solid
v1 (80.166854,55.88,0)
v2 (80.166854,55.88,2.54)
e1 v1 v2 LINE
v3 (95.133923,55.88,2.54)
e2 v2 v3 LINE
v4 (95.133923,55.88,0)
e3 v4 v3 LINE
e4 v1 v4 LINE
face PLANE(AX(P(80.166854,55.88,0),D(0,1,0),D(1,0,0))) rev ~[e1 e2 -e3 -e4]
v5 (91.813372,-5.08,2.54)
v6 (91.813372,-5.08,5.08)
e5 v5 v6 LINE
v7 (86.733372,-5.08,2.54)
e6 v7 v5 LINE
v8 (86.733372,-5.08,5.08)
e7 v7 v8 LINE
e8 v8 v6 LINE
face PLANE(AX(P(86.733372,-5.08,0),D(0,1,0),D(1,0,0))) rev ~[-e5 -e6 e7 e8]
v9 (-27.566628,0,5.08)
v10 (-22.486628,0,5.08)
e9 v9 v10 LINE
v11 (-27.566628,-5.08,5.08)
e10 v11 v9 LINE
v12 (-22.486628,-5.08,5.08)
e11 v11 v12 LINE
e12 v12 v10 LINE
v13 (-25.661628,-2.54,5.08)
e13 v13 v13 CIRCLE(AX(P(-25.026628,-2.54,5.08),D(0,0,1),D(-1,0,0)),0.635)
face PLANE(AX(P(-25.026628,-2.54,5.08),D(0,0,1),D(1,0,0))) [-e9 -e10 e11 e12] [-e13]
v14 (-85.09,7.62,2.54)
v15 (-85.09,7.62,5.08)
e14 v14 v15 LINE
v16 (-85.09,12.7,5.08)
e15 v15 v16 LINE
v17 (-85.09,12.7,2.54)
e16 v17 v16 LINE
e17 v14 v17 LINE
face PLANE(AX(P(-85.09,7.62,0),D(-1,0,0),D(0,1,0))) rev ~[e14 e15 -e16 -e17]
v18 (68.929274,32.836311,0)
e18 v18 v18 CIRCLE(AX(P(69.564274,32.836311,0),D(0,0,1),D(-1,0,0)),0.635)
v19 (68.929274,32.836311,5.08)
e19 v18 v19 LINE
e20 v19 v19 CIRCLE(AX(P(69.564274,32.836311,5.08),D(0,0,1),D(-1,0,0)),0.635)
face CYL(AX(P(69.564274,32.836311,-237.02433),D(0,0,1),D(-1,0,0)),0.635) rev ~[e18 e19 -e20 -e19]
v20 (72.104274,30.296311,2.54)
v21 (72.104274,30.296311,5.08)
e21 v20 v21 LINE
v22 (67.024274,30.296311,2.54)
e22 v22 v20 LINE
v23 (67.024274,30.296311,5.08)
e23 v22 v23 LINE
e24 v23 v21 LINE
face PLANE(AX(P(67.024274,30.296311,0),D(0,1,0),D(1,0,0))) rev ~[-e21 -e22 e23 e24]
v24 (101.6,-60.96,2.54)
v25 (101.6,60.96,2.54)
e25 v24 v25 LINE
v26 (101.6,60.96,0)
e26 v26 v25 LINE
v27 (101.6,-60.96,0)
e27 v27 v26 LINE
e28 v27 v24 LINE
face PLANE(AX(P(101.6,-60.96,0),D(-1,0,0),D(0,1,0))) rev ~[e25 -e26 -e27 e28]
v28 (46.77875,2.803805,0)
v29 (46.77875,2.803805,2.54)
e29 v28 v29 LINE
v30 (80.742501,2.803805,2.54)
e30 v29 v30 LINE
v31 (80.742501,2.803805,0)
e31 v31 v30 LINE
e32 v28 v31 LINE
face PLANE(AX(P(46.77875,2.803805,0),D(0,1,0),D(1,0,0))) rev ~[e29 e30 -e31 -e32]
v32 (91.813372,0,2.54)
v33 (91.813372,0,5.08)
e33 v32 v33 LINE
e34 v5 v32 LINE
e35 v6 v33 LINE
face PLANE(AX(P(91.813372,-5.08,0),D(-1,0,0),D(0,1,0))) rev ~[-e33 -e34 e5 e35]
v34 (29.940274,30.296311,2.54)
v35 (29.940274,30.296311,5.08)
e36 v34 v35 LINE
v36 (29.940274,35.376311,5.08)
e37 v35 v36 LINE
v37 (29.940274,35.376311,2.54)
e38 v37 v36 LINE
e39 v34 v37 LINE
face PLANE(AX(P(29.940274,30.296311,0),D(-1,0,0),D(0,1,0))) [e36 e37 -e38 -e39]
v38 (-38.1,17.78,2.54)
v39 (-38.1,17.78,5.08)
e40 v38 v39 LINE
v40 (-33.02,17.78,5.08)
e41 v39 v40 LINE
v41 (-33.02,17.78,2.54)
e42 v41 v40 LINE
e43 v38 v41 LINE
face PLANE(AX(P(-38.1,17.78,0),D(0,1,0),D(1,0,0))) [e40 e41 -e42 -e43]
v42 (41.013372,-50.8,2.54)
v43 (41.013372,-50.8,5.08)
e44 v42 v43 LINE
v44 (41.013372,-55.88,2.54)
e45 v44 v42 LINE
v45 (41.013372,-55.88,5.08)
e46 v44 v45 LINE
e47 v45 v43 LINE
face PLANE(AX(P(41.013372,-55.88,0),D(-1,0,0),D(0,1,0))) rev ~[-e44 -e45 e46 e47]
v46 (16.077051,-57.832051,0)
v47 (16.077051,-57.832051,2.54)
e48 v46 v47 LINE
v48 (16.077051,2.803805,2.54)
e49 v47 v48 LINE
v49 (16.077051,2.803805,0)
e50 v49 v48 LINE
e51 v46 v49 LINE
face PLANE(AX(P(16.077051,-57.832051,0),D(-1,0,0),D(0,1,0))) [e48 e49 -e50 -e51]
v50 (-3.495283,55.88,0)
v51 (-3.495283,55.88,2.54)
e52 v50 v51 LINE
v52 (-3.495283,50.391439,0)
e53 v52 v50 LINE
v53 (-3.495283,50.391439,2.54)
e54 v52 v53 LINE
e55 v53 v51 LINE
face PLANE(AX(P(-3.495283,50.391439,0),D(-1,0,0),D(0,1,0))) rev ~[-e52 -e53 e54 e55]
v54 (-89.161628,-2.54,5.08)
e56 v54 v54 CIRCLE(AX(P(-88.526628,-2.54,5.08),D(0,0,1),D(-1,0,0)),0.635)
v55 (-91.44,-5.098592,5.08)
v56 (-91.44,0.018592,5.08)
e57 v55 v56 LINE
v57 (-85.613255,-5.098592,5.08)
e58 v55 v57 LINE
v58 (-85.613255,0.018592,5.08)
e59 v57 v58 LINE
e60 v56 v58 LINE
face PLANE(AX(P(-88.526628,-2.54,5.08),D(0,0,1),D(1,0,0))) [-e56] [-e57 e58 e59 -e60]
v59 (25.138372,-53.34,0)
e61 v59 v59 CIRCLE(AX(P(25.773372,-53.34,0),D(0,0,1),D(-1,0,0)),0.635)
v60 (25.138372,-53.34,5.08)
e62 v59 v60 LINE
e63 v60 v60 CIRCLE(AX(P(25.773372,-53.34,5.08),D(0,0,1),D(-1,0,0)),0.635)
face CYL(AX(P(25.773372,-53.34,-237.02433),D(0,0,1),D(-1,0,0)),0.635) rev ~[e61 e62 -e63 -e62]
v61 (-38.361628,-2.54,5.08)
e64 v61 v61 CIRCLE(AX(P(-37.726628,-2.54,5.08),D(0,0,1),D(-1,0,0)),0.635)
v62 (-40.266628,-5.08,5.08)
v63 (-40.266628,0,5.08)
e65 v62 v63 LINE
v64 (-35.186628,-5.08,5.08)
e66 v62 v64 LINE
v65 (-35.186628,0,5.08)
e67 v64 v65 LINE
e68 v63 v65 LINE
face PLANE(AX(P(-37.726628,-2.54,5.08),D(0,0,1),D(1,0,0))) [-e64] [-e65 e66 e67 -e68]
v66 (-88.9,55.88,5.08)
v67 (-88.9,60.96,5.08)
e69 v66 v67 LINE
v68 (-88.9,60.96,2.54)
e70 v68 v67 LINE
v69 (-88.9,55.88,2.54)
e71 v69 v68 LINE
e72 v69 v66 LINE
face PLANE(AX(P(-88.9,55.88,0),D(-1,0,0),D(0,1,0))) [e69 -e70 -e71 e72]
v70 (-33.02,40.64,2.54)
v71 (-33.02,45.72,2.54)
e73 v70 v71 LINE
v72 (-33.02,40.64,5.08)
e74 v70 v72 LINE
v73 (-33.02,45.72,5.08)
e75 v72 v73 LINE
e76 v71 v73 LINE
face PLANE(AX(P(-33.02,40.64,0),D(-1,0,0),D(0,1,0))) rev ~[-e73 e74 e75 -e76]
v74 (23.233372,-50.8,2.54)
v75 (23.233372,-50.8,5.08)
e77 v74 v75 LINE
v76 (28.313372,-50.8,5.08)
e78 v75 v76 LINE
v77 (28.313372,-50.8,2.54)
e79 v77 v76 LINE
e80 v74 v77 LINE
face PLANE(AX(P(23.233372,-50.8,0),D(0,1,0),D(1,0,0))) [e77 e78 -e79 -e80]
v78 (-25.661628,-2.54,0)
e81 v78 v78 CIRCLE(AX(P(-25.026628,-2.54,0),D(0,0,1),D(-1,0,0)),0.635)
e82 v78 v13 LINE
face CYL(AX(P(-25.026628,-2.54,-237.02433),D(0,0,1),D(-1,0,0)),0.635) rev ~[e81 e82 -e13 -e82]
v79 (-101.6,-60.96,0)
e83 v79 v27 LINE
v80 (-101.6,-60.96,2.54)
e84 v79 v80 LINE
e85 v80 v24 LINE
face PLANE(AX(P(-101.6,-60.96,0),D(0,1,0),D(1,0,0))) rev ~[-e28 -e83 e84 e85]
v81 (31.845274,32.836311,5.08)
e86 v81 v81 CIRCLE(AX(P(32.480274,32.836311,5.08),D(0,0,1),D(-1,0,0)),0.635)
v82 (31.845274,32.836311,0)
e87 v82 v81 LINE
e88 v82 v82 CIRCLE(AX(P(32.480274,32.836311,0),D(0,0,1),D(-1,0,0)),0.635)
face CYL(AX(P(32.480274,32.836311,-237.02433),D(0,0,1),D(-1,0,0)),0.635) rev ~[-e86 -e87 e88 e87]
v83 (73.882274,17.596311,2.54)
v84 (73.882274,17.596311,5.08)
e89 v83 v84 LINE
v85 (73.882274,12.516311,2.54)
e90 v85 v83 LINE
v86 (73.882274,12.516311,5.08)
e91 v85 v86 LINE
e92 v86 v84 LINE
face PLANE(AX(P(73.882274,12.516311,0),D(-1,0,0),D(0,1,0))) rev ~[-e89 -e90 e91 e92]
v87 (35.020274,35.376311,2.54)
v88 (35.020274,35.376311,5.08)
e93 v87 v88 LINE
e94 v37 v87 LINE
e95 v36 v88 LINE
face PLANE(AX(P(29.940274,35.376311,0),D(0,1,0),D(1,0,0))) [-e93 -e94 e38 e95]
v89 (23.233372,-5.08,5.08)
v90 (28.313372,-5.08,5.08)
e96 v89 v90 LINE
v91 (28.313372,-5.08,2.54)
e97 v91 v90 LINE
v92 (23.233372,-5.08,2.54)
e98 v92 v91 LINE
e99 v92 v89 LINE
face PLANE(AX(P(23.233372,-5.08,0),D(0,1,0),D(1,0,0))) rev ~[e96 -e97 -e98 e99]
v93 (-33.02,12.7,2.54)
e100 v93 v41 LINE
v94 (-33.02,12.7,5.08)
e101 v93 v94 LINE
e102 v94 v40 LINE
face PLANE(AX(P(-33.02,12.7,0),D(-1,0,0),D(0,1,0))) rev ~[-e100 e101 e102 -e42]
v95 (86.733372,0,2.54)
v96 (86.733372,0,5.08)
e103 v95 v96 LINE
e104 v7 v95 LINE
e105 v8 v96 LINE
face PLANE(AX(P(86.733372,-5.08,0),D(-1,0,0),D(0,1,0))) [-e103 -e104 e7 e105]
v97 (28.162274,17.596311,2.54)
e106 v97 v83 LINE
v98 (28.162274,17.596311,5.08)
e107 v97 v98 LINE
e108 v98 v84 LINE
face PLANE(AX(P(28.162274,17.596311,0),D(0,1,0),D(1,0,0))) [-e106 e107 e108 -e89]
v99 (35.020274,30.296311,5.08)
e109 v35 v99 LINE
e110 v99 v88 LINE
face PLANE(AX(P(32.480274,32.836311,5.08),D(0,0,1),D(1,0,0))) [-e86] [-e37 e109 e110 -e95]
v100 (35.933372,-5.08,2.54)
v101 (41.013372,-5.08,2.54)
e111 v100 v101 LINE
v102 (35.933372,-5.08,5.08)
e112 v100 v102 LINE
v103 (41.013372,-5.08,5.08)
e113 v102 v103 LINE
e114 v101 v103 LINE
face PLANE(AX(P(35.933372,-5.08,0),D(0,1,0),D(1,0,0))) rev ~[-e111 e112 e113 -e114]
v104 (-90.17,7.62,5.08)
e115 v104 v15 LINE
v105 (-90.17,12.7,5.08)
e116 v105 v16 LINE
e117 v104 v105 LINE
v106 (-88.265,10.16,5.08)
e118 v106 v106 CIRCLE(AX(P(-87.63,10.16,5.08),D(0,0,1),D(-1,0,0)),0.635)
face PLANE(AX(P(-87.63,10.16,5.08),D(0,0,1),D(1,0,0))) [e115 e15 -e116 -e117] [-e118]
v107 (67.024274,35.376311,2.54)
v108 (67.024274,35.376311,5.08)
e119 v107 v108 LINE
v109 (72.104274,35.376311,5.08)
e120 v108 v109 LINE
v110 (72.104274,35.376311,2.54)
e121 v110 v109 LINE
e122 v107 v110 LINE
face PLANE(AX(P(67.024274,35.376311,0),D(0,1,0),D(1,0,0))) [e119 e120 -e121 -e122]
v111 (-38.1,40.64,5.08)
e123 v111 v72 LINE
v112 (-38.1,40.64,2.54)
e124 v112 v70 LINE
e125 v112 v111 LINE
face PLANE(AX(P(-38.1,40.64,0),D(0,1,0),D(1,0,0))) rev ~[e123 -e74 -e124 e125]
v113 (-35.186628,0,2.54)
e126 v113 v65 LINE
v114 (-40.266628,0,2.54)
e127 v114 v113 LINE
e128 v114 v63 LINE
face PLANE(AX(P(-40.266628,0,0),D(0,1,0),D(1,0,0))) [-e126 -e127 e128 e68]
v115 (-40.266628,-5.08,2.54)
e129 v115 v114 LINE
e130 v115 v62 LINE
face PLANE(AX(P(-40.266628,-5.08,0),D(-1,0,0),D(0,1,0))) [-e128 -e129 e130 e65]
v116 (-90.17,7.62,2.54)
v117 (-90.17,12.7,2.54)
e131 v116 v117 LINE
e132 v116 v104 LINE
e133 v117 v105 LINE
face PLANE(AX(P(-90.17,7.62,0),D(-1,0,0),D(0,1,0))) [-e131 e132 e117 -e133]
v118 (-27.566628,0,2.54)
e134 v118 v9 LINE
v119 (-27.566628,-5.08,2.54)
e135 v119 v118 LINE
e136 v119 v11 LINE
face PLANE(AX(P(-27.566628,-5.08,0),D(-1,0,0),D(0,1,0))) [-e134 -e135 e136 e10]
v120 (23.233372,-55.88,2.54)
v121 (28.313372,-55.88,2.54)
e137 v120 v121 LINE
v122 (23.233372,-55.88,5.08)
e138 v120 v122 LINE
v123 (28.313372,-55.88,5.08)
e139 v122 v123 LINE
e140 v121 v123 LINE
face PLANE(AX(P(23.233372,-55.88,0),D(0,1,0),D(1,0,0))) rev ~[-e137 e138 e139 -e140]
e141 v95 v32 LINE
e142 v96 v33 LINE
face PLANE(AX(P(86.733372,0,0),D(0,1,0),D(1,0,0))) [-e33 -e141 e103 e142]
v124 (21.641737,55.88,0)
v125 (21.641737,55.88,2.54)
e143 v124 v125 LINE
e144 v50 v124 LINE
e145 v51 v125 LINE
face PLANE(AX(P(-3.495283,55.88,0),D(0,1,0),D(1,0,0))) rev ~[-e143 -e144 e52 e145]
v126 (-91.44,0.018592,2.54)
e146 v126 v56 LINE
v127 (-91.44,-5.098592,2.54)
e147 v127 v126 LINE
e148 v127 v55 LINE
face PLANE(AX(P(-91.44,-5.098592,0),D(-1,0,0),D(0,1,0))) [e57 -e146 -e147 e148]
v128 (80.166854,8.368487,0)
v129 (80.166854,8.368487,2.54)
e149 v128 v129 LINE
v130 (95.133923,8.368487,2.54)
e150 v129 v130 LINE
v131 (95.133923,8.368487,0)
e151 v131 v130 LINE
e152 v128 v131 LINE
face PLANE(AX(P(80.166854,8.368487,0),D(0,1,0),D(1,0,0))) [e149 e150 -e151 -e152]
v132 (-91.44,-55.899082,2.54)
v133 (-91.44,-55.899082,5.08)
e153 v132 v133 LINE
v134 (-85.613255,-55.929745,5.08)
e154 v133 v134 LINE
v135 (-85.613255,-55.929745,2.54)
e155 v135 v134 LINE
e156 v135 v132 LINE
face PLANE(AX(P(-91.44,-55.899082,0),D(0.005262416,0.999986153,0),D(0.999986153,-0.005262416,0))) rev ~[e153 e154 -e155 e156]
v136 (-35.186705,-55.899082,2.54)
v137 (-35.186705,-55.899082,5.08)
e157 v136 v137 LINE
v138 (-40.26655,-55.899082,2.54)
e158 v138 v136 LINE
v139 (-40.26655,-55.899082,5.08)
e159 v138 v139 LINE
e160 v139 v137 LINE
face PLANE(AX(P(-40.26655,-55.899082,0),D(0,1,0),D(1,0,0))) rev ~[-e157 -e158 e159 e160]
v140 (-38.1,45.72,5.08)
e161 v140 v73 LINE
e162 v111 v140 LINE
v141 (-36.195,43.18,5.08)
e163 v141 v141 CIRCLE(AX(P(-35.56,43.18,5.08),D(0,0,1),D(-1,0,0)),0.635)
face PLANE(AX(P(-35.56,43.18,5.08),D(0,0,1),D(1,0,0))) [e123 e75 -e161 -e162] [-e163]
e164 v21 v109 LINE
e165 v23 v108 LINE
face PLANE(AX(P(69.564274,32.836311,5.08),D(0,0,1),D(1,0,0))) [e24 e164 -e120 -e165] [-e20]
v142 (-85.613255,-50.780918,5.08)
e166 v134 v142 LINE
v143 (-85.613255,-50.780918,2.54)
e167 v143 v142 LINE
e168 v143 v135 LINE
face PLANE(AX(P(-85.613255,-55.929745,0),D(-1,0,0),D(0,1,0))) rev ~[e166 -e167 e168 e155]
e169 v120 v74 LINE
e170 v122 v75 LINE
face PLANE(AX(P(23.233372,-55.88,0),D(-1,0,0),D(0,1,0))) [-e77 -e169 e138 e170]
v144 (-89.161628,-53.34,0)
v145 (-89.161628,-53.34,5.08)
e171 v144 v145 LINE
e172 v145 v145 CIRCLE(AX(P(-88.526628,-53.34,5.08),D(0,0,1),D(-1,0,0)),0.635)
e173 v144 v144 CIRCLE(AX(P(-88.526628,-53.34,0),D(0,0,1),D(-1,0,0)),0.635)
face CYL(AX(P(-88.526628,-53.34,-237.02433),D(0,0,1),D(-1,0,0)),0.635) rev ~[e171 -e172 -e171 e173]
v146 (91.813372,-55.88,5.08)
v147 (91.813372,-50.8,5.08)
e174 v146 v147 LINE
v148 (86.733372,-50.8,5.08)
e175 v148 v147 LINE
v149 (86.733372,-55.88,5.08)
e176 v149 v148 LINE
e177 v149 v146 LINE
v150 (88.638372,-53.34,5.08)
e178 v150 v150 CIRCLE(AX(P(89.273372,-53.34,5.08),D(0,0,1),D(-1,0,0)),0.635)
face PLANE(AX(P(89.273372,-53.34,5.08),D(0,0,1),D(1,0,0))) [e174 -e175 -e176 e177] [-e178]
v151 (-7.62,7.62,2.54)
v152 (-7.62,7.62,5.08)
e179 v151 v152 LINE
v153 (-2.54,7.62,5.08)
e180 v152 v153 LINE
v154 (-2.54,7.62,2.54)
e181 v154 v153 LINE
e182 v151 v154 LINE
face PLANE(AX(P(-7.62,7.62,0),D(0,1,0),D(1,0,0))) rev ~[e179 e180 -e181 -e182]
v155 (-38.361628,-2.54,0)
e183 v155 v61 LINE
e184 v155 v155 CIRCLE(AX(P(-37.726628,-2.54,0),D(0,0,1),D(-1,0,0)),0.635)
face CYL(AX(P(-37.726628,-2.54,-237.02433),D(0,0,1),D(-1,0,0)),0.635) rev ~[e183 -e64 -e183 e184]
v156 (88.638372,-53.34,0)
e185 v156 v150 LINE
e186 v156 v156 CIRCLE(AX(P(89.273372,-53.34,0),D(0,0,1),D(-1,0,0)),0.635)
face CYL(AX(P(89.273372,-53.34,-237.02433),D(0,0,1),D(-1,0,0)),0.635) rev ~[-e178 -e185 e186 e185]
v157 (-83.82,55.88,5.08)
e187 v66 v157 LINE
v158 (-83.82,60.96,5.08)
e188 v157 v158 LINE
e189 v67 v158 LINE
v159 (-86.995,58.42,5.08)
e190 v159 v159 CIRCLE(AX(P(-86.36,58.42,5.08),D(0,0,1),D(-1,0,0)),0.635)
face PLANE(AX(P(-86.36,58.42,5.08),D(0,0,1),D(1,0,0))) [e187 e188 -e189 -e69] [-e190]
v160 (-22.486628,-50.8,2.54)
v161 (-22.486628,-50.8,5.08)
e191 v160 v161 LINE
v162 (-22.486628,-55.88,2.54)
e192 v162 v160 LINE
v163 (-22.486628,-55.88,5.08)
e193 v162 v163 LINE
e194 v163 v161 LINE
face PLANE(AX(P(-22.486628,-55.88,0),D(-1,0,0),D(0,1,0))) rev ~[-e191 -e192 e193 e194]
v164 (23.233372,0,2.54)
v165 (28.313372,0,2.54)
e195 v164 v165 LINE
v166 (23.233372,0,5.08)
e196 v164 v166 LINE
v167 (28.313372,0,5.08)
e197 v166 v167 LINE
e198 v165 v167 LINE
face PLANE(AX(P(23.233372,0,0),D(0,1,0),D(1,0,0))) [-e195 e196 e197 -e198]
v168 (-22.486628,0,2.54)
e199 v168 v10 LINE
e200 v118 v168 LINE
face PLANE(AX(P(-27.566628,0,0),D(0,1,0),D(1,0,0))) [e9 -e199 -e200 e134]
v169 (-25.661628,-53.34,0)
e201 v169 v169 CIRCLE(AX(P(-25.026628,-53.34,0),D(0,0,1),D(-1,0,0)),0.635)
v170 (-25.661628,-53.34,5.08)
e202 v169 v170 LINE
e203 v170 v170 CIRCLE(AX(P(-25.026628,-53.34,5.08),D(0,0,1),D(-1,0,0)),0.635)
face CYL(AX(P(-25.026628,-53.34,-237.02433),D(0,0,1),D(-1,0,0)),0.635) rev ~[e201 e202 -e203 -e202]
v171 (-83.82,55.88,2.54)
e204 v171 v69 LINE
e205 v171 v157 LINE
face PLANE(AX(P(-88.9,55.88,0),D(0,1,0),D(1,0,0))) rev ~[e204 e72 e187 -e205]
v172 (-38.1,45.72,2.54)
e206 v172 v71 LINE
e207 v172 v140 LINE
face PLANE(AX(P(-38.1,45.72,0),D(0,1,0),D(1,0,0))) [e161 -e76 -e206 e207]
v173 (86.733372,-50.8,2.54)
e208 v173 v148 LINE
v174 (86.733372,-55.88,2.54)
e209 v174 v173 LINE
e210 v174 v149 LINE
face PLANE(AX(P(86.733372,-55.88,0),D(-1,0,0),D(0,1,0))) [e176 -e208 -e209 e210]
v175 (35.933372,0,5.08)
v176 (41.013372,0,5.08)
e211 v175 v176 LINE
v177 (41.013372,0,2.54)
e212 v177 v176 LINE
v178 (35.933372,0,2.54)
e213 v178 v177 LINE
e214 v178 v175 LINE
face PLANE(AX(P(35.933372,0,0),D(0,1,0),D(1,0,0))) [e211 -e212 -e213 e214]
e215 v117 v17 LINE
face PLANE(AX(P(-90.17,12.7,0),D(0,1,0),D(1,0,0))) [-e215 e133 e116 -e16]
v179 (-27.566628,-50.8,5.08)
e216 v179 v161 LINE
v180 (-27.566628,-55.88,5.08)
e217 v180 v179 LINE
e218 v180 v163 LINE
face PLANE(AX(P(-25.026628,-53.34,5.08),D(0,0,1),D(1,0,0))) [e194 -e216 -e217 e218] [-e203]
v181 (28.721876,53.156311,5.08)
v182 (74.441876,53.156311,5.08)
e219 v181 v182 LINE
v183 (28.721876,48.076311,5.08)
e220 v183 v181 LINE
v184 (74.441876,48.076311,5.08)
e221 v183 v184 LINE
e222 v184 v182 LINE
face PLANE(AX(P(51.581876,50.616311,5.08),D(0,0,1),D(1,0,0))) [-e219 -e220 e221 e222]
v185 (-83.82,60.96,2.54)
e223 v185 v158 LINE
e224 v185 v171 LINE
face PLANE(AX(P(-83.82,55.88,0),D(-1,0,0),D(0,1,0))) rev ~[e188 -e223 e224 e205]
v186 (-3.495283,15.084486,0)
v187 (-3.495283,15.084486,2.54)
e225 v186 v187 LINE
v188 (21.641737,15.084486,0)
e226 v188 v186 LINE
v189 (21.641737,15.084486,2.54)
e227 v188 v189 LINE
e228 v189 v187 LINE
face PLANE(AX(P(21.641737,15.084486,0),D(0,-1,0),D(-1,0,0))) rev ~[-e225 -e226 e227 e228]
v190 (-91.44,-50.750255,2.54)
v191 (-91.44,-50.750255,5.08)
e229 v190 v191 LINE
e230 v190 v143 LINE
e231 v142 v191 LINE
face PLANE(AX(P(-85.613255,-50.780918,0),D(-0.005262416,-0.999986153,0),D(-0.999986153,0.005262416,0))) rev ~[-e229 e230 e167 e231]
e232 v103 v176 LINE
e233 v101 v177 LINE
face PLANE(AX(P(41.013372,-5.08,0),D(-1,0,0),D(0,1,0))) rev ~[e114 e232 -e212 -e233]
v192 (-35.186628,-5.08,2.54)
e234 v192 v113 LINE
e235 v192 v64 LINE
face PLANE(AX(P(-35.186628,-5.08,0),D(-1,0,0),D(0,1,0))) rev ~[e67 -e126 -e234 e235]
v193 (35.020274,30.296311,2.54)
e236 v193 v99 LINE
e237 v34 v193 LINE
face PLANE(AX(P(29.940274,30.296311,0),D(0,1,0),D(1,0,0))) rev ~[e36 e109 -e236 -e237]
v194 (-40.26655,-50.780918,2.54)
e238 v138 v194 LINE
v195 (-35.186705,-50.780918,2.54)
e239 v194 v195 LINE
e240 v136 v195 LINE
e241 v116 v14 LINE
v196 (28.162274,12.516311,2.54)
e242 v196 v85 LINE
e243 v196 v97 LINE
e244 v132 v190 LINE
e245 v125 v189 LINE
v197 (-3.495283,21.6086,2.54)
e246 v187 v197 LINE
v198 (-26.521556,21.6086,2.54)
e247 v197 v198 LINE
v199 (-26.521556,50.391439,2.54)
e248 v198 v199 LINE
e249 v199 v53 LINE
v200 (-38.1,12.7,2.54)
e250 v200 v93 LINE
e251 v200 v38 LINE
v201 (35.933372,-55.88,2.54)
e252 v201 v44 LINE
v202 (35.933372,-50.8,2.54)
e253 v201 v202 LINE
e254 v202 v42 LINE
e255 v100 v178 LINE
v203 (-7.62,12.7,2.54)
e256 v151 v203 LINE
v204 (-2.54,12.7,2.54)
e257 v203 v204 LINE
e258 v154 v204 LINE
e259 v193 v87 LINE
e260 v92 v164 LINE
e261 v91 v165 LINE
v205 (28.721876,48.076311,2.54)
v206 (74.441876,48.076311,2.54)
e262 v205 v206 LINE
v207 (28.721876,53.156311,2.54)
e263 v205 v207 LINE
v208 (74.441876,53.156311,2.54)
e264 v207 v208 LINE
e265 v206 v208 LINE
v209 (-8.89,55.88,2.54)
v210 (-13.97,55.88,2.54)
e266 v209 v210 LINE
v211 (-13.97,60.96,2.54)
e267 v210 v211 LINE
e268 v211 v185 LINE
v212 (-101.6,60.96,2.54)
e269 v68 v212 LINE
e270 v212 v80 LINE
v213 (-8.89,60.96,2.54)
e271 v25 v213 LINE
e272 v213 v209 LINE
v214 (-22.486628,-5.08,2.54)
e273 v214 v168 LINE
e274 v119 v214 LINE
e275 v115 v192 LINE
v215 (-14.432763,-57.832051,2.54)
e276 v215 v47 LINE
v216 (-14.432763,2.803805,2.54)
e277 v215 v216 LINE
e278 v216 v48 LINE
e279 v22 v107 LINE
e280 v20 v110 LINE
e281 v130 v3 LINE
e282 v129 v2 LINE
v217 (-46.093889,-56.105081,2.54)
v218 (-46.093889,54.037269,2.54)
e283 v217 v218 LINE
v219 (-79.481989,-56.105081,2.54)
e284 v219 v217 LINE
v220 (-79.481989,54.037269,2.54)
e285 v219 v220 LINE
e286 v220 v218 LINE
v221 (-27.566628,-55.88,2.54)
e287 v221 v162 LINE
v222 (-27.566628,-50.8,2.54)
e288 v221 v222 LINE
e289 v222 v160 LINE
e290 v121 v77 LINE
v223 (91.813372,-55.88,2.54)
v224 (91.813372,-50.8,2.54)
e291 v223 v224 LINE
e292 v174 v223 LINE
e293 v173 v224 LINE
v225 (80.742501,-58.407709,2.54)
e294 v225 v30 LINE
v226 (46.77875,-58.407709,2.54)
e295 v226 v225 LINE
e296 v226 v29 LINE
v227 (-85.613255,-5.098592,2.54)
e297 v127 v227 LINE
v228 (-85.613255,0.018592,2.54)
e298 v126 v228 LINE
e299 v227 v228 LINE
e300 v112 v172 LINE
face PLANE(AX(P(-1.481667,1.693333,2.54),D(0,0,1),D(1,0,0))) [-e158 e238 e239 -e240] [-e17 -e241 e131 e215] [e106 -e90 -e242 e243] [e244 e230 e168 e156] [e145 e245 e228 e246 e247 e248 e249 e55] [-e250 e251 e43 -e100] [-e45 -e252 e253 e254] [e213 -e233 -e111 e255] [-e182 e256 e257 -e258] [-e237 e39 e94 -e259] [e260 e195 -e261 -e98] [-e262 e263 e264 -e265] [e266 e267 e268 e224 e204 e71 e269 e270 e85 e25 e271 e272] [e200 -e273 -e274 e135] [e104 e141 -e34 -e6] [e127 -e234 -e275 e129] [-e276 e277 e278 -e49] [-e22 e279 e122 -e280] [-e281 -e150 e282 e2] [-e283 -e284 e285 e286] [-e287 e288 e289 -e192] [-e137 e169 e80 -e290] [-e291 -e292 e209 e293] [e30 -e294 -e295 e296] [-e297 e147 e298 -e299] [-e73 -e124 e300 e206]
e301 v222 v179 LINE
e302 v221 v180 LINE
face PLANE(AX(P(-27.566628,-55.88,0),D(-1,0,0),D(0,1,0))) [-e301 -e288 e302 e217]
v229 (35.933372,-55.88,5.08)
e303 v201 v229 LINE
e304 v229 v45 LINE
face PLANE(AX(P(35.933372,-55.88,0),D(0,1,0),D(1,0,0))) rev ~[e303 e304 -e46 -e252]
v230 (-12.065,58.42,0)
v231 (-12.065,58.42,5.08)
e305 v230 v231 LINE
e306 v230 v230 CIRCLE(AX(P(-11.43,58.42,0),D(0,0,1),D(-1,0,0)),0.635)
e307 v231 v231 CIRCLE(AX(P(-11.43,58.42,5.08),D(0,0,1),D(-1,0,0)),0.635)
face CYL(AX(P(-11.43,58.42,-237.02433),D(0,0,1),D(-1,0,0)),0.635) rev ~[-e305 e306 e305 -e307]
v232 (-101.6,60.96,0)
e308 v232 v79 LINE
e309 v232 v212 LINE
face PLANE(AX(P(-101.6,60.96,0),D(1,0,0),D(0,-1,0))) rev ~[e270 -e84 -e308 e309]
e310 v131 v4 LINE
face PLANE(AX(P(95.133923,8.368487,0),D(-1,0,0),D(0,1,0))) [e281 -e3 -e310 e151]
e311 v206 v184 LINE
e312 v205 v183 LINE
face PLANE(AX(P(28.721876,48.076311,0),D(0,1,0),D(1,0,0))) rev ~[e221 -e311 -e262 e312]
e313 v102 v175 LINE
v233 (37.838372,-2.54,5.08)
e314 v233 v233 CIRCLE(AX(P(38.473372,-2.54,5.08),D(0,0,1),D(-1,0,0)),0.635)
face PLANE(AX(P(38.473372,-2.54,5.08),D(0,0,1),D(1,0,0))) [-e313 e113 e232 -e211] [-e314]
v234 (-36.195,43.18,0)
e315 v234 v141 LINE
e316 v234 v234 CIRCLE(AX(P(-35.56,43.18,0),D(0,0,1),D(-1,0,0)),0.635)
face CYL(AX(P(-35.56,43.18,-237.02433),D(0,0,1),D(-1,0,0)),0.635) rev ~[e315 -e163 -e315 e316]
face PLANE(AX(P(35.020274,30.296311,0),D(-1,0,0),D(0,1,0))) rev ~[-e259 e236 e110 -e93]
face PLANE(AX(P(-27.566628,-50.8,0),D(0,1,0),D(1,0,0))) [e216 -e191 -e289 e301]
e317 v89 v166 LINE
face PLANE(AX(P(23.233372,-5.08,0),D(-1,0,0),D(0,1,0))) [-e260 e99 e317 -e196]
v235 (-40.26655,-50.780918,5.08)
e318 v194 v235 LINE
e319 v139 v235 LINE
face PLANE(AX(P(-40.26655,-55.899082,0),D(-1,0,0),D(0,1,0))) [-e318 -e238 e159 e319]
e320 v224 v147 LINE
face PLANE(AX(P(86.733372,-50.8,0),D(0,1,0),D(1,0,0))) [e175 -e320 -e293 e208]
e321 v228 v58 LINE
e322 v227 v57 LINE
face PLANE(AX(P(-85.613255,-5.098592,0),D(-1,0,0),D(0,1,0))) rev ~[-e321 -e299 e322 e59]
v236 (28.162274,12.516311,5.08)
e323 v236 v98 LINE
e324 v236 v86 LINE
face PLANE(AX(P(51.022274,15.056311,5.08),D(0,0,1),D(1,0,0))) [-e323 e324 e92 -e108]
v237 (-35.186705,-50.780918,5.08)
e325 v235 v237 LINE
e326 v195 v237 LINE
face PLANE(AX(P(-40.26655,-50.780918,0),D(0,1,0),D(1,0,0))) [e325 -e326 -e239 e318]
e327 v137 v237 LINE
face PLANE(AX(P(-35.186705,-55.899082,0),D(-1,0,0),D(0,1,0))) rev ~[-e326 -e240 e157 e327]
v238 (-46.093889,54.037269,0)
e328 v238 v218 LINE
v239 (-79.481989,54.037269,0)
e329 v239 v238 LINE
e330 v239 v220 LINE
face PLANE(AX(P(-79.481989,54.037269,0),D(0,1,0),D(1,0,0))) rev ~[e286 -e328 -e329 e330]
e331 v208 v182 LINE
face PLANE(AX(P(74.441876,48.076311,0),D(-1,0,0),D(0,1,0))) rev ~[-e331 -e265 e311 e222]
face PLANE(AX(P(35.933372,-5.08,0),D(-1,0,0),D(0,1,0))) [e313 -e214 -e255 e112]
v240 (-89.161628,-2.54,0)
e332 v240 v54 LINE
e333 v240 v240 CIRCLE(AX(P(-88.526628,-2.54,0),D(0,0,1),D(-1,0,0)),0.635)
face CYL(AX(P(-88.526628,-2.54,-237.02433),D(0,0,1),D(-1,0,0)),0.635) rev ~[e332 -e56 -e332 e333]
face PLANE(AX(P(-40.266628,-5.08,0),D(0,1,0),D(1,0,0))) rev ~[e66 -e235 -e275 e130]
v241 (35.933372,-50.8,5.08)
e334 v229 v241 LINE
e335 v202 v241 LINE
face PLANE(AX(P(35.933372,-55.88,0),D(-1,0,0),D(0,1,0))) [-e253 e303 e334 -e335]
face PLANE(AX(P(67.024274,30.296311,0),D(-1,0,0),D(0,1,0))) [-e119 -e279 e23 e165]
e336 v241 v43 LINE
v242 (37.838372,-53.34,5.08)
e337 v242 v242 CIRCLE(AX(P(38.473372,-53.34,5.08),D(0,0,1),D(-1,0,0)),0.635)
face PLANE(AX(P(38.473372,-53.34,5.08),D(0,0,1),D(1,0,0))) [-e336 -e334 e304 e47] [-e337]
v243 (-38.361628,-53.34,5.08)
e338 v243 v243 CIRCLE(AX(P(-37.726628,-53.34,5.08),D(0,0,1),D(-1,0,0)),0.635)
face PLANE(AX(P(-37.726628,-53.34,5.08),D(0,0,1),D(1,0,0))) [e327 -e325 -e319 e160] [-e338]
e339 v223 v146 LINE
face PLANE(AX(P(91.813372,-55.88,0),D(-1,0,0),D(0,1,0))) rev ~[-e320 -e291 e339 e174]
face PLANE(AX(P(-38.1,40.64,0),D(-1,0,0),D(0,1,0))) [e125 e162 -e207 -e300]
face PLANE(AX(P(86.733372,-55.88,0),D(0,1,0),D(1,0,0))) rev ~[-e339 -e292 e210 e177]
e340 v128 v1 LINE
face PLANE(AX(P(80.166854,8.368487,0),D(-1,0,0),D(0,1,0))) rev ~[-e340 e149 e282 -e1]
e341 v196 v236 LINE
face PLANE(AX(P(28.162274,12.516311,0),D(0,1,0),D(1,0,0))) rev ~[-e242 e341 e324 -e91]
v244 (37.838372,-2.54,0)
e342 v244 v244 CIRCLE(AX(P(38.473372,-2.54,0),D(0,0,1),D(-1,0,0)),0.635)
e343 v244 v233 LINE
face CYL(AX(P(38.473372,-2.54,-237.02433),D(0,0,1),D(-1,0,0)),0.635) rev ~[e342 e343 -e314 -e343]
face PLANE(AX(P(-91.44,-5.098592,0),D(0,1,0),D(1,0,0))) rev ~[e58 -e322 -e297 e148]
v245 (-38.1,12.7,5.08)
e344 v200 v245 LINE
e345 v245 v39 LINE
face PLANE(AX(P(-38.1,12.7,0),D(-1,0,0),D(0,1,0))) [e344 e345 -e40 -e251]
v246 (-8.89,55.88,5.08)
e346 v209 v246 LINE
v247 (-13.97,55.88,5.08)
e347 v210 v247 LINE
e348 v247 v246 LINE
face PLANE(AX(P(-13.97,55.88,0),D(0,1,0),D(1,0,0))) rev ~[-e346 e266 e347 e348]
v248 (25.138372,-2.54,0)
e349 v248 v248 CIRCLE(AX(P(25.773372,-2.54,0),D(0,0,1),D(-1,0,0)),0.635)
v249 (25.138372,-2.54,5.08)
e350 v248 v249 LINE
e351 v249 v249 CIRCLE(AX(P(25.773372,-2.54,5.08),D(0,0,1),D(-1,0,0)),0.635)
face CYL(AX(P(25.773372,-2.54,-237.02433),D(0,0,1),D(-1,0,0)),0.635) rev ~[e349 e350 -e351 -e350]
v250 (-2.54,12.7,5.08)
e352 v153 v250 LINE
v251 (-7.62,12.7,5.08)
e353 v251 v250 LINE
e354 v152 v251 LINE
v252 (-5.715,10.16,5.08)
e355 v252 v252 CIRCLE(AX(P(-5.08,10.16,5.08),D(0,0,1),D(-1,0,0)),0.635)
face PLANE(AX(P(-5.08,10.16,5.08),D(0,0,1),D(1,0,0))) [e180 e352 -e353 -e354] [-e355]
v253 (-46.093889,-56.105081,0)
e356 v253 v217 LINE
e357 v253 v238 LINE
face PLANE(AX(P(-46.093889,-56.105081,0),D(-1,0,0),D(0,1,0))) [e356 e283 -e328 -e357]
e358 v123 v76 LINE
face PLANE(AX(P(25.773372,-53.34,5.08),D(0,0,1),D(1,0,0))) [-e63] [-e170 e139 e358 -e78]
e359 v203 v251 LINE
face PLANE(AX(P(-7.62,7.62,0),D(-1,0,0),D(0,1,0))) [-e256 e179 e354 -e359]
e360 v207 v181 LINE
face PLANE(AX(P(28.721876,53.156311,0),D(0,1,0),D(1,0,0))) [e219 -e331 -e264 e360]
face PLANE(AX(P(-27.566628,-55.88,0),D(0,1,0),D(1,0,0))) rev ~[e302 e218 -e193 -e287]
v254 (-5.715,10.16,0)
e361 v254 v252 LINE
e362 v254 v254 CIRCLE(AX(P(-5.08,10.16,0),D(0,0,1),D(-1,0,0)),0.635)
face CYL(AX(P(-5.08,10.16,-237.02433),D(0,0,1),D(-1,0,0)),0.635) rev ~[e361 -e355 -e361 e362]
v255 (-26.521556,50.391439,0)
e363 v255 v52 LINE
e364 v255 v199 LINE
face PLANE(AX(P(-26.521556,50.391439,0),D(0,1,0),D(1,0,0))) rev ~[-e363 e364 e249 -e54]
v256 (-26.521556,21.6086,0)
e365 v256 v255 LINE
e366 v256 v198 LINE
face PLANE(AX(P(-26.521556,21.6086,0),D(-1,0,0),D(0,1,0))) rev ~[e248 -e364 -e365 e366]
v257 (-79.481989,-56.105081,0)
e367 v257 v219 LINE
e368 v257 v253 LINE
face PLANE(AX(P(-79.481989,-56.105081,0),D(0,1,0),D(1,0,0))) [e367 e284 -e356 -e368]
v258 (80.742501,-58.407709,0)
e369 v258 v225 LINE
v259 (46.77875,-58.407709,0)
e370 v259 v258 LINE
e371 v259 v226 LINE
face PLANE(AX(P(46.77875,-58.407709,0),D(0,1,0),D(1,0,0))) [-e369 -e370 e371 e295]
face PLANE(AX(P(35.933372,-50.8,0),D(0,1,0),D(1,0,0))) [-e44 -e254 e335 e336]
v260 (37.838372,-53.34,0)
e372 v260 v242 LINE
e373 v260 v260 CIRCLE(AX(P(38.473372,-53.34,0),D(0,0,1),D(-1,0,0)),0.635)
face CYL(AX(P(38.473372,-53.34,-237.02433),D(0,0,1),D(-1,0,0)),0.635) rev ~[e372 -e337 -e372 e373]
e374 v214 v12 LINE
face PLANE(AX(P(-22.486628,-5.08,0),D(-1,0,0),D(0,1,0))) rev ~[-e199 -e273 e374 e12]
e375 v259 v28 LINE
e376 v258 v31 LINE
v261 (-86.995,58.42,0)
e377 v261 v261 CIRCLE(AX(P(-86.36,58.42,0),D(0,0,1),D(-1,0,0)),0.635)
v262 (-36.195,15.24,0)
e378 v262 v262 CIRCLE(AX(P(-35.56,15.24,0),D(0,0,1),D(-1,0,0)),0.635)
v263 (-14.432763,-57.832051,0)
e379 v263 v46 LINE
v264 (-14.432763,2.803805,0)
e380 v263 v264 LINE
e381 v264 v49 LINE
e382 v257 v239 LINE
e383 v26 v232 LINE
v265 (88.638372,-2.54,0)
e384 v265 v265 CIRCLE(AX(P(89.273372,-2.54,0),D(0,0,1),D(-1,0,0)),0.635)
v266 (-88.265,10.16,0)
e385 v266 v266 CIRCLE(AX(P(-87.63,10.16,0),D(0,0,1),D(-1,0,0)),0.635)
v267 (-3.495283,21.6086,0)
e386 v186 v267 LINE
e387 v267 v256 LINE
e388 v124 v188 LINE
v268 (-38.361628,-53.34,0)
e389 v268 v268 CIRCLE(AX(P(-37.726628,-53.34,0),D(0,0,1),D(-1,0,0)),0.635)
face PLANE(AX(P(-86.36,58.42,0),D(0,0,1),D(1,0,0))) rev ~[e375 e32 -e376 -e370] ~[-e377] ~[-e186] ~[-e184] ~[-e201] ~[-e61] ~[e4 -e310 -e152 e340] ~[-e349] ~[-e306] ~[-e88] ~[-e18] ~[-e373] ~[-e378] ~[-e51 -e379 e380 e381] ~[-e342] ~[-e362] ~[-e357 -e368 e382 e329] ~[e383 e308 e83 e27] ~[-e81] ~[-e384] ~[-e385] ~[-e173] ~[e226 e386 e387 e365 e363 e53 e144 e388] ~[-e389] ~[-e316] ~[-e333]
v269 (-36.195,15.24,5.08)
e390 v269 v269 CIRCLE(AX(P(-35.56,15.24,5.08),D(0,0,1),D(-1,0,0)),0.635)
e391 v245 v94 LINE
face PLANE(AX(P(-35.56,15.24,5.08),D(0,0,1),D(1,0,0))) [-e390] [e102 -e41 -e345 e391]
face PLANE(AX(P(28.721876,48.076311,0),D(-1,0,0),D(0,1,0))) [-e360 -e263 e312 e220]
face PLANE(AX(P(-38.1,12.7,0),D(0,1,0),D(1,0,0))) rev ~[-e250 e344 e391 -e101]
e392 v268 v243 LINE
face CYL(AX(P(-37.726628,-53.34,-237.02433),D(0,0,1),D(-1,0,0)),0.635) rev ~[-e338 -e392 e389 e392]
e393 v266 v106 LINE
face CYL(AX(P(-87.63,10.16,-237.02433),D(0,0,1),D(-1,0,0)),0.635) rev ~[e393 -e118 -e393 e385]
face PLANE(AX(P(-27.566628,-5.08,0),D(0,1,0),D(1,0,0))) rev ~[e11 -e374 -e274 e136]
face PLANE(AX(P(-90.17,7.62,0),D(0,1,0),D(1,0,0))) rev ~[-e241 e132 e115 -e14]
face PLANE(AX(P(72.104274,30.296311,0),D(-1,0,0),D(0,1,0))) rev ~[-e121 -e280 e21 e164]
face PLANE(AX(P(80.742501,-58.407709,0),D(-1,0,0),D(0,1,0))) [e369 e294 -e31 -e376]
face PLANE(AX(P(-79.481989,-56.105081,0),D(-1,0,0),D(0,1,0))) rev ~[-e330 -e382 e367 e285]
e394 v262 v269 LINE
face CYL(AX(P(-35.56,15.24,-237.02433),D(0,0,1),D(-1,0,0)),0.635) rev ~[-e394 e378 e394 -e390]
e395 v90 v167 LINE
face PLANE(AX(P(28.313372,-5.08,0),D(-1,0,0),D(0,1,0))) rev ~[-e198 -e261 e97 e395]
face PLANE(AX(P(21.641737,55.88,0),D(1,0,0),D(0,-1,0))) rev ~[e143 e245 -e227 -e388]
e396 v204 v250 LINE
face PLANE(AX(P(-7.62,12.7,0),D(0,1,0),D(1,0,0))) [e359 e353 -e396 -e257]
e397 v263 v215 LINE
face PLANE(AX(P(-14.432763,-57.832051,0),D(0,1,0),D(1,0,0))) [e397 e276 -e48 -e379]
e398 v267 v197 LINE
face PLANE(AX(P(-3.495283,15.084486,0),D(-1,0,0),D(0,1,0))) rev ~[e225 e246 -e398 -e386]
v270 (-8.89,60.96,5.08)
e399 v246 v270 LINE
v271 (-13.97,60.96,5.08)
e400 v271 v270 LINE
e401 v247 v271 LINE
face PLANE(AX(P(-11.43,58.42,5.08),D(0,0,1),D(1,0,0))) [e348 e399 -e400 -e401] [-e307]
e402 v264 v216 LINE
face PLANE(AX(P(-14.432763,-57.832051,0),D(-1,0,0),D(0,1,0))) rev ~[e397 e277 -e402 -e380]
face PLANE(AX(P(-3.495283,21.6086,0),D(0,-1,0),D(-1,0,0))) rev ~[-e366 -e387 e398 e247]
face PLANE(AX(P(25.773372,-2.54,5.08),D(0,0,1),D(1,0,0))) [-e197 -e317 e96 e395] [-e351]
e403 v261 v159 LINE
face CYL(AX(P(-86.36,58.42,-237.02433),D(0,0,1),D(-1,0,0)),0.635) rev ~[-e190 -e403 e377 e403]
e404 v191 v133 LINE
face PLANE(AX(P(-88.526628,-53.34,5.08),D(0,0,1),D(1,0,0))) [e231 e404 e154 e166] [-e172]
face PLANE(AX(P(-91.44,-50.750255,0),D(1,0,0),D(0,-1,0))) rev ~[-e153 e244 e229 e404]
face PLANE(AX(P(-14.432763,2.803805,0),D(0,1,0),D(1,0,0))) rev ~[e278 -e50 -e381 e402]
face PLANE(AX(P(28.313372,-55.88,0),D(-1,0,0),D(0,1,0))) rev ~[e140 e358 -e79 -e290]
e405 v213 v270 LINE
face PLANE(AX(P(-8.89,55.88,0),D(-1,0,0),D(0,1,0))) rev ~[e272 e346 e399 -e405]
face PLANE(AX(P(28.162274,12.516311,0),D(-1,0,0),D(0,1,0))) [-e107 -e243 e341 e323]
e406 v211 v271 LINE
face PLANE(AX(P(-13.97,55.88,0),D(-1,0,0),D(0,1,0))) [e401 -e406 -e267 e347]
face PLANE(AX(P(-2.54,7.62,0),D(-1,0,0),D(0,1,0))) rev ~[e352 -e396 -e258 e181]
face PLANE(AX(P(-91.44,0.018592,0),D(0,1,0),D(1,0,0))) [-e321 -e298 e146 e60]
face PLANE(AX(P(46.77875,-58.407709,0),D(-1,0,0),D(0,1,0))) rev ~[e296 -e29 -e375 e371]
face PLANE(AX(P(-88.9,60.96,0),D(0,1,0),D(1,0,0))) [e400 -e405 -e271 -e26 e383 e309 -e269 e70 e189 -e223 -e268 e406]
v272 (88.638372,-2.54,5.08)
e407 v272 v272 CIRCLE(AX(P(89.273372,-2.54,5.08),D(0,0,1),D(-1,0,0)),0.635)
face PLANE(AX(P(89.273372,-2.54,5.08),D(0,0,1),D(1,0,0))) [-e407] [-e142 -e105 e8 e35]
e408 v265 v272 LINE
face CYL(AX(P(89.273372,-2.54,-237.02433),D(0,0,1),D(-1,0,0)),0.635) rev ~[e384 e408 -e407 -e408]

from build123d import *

# Parameters (mm, degrees)
F0_W     = 5.0798452705
F0_H     = 5.1181645604
F0_W_2   = 5.08
F0_H_2   = 5.08
F0_W_3   = 5.8267449073
F0_H_3   = 5.1171841682
F0_W_4   = 33.3881005645
F0_H_4   = 110.1423501968
F0_W_5   = 30.5098136887
F0_H_5   = 60.6358556543
F0_W_6   = 33.9637510478
F0_H_6   = 61.2115135882
F0_W_7   = 45.72
F0_W_8   = 14.9670690298
F0_H_7   = 47.5115125301
F1_DEPTH = 2.54
F2_DEPTH = 5.08
F5_D     = 1.27


# Not quite as in the source:
# - a feature of the source that left no trace in its solid (it failed there, or was rolled back) is left out
# - a feature names something its author has since deleted; it is built from what else it names


with BuildPart() as f1:
    # F0 (on Top) → F1 (new body)
    with BuildSketch(Plane.XY):
        Polygon((101.6, -60.96), (101.6, 60.96), (-8.89, 60.96), (-8.89, 55.88), (-13.97, 55.88), (-13.97, 60.96), (-83.82, 60.96), (-83.82, 55.88), (-88.9, 55.88), (-88.9, 60.96), (-101.6, 60.96), (-101.6, -60.96), align=None)
        Polygon((-91.44, -50.7502545385), (-85.6132550927, -50.7809177198), (-85.6132550927, -55.9297454615), (-91.44, -55.8990822802), align=None, mode=Mode.SUBTRACT)
        with Locations((-37.7266275464, -53.34)):
            Rectangle(F0_W, F0_H, mode=Mode.SUBTRACT)
        with Locations((-25.0266275464, -53.34)):
            Rectangle(F0_W_2, F0_H_2, mode=Mode.SUBTRACT)
        with Locations((-88.5266275464, -2.54)):
            Rectangle(F0_W_3, F0_H_3, mode=Mode.SUBTRACT)
        with Locations((-62.787938863, -1.0339058936)):
            Rectangle(F0_W_4, F0_H_4, mode=Mode.SUBTRACT)
        with Locations((-37.7266275464, -2.54)):
            Rectangle(F0_W_2, F0_H_2, mode=Mode.SUBTRACT)
        with Locations((-25.0266275464, -2.54)):
            Rectangle(F0_W_2, F0_H_2, mode=Mode.SUBTRACT)
        with Locations((25.7733724536, -53.34)):
            Rectangle(F0_W_2, F0_H_2, mode=Mode.SUBTRACT)
        with Locations((38.4733724536, -53.34)):
            Rectangle(F0_W_2, F0_H_2, mode=Mode.SUBTRACT)
        with Locations((89.2733724536, -53.34)):
            Rectangle(F0_W_2, F0_H_2, mode=Mode.SUBTRACT)
        with Locations((0.8221440949, -27.5141232414)):
            Rectangle(F0_W_5, F0_H_5, mode=Mode.SUBTRACT)
        with Locations((25.7733724536, -2.54)):
            Rectangle(F0_W_2, F0_H_2, mode=Mode.SUBTRACT)
        with Locations((38.4733724536, -2.54)):
            Rectangle(F0_W_2, F0_H_2, mode=Mode.SUBTRACT)
        with Locations((63.7606251985, -27.8019522084)):
            Rectangle(F0_W_6, F0_H_6, mode=Mode.SUBTRACT)
        with Locations((89.2733724536, -2.54)):
            Rectangle(F0_W_2, F0_H_2, mode=Mode.SUBTRACT)
        with Locations((-87.63, 10.16)):
            Rectangle(F0_W_2, F0_H_2, mode=Mode.SUBTRACT)
        with Locations((-5.08, 10.16)):
            Rectangle(F0_W_2, F0_H_2, mode=Mode.SUBTRACT)
        with Locations((-35.56, 15.24)):
            Rectangle(F0_W_2, F0_H_2, mode=Mode.SUBTRACT)
        with Locations((-35.56, 43.18)):
            Rectangle(F0_W_2, F0_H_2, mode=Mode.SUBTRACT)
        Polygon((-3.4952829592, 50.3914393485), (-3.4952829592, 55.88), (21.6417368501, 55.88), (21.6417368501, 15.0844864547), (-3.4952829592, 15.0844864547), (-3.4952829592, 21.6086003929), (-26.5215560794, 21.6086003929), (-26.5215560794, 50.3914393485), align=None, mode=Mode.SUBTRACT)
        with Locations((51.0222736127, 15.0563112164)):
            Rectangle(F0_W_7, F0_H_2, mode=Mode.SUBTRACT)
        with Locations((32.4802736127, 32.8363112164)):
            Rectangle(F0_W_2, F0_H_2, mode=Mode.SUBTRACT)
        with Locations((69.5642736127, 32.8363112164)):
            Rectangle(F0_W_2, F0_H_2, mode=Mode.SUBTRACT)
        with Locations((87.6503884792, 32.1242437349)):
            Rectangle(F0_W_8, F0_H_7, mode=Mode.SUBTRACT)
        with Locations((51.5818764424, 50.6163112164)):
            Rectangle(F0_W_7, F0_H_2, mode=Mode.SUBTRACT)
    extrude(amount=F1_DEPTH)

    # F0 (on Top) → F2 (join)
    with BuildSketch(Plane.XY):
        with Locations((-86.36, 58.42)):
            Rectangle(F0_W_2, F0_H_2)
        with Locations((-35.56, 43.18)):
            Rectangle(F0_W_2, F0_H_2)
        with Locations((-11.43, 58.42)):
            Rectangle(F0_W_2, F0_H_2)
        with Locations((-35.56, 15.24)):
            Rectangle(F0_W_2, F0_H_2)
        with Locations((-5.08, 10.16)):
            Rectangle(F0_W_2, F0_H_2)
        with Locations((-87.63, 10.16)):
            Rectangle(F0_W_2, F0_H_2)
        with Locations((-88.5266275464, -2.54)):
            Rectangle(F0_W_3, F0_H_3)
        with Locations((-37.7266275464, -2.54)):
            Rectangle(F0_W_2, F0_H_2)
        with Locations((-37.7266275464, -53.34)):
            Rectangle(F0_W, F0_H)
        with Locations((-25.0266275464, -2.54)):
            Rectangle(F0_W_2, F0_H_2)
        with Locations((25.7733724536, -2.54)):
            Rectangle(F0_W_2, F0_H_2)
        with Locations((38.4733724536, -2.54)):
            Rectangle(F0_W_2, F0_H_2)
        with Locations((89.2733724536, -2.54)):
            Rectangle(F0_W_2, F0_H_2)
        with Locations((89.2733724536, -53.34)):
            Rectangle(F0_W_2, F0_H_2)
        with Locations((38.4733724536, -53.34)):
            Rectangle(F0_W_2, F0_H_2)
        with Locations((25.7733724536, -53.34)):
            Rectangle(F0_W_2, F0_H_2)
        with Locations((-25.0266275464, -53.34)):
            Rectangle(F0_W_2, F0_H_2)
        Polygon((-85.6132550927, -55.9297454615), (-85.6132550927, -50.7809177198), (-91.44, -50.7502545385), (-91.44, -55.8990822802), align=None)
        with Locations((32.4802736127, 32.8363112164)):
            Rectangle(F0_W_2, F0_H_2)
        with Locations((51.0222736127, 15.0563112164)):
            Rectangle(F0_W_7, F0_H_2)
        with Locations((69.5642736127, 32.8363112164)):
            Rectangle(F0_W_2, F0_H_2)
        with Locations((51.5818764424, 50.6163112164)):
            Rectangle(F0_W_7, F0_H_2)
    extrude(amount=F2_DEPTH)

    # F5 (through all)
    with Locations(Plane(origin=(0, 0, 0), x_dir=(1, 0, 0), z_dir=(0, 0, -1))):
        with Locations((-25.0266275464, 2.54), (-37.7266275464, 2.54), (25.7733724536, 2.54), (38.4733724536, 2.54), (89.2733724536, 2.54), (89.2733724536, 53.34), (38.4733724536, 53.34), (25.7733724536, 53.34), (-25.0266275464, 53.34), (-37.7266275464, 53.34), (-88.5266275464, 53.34), (-88.5266275464, 2.54), (-87.63, -10.16), (-35.56, -15.24), (-5.08, -10.16), (32.4802736127, -32.8363112164), (69.5642736127, -32.8363112164), (-11.43, -58.42), (-35.56, -43.18), (-86.36, -58.42)):
            Hole(F5_D / 2)


solid = f1.part
